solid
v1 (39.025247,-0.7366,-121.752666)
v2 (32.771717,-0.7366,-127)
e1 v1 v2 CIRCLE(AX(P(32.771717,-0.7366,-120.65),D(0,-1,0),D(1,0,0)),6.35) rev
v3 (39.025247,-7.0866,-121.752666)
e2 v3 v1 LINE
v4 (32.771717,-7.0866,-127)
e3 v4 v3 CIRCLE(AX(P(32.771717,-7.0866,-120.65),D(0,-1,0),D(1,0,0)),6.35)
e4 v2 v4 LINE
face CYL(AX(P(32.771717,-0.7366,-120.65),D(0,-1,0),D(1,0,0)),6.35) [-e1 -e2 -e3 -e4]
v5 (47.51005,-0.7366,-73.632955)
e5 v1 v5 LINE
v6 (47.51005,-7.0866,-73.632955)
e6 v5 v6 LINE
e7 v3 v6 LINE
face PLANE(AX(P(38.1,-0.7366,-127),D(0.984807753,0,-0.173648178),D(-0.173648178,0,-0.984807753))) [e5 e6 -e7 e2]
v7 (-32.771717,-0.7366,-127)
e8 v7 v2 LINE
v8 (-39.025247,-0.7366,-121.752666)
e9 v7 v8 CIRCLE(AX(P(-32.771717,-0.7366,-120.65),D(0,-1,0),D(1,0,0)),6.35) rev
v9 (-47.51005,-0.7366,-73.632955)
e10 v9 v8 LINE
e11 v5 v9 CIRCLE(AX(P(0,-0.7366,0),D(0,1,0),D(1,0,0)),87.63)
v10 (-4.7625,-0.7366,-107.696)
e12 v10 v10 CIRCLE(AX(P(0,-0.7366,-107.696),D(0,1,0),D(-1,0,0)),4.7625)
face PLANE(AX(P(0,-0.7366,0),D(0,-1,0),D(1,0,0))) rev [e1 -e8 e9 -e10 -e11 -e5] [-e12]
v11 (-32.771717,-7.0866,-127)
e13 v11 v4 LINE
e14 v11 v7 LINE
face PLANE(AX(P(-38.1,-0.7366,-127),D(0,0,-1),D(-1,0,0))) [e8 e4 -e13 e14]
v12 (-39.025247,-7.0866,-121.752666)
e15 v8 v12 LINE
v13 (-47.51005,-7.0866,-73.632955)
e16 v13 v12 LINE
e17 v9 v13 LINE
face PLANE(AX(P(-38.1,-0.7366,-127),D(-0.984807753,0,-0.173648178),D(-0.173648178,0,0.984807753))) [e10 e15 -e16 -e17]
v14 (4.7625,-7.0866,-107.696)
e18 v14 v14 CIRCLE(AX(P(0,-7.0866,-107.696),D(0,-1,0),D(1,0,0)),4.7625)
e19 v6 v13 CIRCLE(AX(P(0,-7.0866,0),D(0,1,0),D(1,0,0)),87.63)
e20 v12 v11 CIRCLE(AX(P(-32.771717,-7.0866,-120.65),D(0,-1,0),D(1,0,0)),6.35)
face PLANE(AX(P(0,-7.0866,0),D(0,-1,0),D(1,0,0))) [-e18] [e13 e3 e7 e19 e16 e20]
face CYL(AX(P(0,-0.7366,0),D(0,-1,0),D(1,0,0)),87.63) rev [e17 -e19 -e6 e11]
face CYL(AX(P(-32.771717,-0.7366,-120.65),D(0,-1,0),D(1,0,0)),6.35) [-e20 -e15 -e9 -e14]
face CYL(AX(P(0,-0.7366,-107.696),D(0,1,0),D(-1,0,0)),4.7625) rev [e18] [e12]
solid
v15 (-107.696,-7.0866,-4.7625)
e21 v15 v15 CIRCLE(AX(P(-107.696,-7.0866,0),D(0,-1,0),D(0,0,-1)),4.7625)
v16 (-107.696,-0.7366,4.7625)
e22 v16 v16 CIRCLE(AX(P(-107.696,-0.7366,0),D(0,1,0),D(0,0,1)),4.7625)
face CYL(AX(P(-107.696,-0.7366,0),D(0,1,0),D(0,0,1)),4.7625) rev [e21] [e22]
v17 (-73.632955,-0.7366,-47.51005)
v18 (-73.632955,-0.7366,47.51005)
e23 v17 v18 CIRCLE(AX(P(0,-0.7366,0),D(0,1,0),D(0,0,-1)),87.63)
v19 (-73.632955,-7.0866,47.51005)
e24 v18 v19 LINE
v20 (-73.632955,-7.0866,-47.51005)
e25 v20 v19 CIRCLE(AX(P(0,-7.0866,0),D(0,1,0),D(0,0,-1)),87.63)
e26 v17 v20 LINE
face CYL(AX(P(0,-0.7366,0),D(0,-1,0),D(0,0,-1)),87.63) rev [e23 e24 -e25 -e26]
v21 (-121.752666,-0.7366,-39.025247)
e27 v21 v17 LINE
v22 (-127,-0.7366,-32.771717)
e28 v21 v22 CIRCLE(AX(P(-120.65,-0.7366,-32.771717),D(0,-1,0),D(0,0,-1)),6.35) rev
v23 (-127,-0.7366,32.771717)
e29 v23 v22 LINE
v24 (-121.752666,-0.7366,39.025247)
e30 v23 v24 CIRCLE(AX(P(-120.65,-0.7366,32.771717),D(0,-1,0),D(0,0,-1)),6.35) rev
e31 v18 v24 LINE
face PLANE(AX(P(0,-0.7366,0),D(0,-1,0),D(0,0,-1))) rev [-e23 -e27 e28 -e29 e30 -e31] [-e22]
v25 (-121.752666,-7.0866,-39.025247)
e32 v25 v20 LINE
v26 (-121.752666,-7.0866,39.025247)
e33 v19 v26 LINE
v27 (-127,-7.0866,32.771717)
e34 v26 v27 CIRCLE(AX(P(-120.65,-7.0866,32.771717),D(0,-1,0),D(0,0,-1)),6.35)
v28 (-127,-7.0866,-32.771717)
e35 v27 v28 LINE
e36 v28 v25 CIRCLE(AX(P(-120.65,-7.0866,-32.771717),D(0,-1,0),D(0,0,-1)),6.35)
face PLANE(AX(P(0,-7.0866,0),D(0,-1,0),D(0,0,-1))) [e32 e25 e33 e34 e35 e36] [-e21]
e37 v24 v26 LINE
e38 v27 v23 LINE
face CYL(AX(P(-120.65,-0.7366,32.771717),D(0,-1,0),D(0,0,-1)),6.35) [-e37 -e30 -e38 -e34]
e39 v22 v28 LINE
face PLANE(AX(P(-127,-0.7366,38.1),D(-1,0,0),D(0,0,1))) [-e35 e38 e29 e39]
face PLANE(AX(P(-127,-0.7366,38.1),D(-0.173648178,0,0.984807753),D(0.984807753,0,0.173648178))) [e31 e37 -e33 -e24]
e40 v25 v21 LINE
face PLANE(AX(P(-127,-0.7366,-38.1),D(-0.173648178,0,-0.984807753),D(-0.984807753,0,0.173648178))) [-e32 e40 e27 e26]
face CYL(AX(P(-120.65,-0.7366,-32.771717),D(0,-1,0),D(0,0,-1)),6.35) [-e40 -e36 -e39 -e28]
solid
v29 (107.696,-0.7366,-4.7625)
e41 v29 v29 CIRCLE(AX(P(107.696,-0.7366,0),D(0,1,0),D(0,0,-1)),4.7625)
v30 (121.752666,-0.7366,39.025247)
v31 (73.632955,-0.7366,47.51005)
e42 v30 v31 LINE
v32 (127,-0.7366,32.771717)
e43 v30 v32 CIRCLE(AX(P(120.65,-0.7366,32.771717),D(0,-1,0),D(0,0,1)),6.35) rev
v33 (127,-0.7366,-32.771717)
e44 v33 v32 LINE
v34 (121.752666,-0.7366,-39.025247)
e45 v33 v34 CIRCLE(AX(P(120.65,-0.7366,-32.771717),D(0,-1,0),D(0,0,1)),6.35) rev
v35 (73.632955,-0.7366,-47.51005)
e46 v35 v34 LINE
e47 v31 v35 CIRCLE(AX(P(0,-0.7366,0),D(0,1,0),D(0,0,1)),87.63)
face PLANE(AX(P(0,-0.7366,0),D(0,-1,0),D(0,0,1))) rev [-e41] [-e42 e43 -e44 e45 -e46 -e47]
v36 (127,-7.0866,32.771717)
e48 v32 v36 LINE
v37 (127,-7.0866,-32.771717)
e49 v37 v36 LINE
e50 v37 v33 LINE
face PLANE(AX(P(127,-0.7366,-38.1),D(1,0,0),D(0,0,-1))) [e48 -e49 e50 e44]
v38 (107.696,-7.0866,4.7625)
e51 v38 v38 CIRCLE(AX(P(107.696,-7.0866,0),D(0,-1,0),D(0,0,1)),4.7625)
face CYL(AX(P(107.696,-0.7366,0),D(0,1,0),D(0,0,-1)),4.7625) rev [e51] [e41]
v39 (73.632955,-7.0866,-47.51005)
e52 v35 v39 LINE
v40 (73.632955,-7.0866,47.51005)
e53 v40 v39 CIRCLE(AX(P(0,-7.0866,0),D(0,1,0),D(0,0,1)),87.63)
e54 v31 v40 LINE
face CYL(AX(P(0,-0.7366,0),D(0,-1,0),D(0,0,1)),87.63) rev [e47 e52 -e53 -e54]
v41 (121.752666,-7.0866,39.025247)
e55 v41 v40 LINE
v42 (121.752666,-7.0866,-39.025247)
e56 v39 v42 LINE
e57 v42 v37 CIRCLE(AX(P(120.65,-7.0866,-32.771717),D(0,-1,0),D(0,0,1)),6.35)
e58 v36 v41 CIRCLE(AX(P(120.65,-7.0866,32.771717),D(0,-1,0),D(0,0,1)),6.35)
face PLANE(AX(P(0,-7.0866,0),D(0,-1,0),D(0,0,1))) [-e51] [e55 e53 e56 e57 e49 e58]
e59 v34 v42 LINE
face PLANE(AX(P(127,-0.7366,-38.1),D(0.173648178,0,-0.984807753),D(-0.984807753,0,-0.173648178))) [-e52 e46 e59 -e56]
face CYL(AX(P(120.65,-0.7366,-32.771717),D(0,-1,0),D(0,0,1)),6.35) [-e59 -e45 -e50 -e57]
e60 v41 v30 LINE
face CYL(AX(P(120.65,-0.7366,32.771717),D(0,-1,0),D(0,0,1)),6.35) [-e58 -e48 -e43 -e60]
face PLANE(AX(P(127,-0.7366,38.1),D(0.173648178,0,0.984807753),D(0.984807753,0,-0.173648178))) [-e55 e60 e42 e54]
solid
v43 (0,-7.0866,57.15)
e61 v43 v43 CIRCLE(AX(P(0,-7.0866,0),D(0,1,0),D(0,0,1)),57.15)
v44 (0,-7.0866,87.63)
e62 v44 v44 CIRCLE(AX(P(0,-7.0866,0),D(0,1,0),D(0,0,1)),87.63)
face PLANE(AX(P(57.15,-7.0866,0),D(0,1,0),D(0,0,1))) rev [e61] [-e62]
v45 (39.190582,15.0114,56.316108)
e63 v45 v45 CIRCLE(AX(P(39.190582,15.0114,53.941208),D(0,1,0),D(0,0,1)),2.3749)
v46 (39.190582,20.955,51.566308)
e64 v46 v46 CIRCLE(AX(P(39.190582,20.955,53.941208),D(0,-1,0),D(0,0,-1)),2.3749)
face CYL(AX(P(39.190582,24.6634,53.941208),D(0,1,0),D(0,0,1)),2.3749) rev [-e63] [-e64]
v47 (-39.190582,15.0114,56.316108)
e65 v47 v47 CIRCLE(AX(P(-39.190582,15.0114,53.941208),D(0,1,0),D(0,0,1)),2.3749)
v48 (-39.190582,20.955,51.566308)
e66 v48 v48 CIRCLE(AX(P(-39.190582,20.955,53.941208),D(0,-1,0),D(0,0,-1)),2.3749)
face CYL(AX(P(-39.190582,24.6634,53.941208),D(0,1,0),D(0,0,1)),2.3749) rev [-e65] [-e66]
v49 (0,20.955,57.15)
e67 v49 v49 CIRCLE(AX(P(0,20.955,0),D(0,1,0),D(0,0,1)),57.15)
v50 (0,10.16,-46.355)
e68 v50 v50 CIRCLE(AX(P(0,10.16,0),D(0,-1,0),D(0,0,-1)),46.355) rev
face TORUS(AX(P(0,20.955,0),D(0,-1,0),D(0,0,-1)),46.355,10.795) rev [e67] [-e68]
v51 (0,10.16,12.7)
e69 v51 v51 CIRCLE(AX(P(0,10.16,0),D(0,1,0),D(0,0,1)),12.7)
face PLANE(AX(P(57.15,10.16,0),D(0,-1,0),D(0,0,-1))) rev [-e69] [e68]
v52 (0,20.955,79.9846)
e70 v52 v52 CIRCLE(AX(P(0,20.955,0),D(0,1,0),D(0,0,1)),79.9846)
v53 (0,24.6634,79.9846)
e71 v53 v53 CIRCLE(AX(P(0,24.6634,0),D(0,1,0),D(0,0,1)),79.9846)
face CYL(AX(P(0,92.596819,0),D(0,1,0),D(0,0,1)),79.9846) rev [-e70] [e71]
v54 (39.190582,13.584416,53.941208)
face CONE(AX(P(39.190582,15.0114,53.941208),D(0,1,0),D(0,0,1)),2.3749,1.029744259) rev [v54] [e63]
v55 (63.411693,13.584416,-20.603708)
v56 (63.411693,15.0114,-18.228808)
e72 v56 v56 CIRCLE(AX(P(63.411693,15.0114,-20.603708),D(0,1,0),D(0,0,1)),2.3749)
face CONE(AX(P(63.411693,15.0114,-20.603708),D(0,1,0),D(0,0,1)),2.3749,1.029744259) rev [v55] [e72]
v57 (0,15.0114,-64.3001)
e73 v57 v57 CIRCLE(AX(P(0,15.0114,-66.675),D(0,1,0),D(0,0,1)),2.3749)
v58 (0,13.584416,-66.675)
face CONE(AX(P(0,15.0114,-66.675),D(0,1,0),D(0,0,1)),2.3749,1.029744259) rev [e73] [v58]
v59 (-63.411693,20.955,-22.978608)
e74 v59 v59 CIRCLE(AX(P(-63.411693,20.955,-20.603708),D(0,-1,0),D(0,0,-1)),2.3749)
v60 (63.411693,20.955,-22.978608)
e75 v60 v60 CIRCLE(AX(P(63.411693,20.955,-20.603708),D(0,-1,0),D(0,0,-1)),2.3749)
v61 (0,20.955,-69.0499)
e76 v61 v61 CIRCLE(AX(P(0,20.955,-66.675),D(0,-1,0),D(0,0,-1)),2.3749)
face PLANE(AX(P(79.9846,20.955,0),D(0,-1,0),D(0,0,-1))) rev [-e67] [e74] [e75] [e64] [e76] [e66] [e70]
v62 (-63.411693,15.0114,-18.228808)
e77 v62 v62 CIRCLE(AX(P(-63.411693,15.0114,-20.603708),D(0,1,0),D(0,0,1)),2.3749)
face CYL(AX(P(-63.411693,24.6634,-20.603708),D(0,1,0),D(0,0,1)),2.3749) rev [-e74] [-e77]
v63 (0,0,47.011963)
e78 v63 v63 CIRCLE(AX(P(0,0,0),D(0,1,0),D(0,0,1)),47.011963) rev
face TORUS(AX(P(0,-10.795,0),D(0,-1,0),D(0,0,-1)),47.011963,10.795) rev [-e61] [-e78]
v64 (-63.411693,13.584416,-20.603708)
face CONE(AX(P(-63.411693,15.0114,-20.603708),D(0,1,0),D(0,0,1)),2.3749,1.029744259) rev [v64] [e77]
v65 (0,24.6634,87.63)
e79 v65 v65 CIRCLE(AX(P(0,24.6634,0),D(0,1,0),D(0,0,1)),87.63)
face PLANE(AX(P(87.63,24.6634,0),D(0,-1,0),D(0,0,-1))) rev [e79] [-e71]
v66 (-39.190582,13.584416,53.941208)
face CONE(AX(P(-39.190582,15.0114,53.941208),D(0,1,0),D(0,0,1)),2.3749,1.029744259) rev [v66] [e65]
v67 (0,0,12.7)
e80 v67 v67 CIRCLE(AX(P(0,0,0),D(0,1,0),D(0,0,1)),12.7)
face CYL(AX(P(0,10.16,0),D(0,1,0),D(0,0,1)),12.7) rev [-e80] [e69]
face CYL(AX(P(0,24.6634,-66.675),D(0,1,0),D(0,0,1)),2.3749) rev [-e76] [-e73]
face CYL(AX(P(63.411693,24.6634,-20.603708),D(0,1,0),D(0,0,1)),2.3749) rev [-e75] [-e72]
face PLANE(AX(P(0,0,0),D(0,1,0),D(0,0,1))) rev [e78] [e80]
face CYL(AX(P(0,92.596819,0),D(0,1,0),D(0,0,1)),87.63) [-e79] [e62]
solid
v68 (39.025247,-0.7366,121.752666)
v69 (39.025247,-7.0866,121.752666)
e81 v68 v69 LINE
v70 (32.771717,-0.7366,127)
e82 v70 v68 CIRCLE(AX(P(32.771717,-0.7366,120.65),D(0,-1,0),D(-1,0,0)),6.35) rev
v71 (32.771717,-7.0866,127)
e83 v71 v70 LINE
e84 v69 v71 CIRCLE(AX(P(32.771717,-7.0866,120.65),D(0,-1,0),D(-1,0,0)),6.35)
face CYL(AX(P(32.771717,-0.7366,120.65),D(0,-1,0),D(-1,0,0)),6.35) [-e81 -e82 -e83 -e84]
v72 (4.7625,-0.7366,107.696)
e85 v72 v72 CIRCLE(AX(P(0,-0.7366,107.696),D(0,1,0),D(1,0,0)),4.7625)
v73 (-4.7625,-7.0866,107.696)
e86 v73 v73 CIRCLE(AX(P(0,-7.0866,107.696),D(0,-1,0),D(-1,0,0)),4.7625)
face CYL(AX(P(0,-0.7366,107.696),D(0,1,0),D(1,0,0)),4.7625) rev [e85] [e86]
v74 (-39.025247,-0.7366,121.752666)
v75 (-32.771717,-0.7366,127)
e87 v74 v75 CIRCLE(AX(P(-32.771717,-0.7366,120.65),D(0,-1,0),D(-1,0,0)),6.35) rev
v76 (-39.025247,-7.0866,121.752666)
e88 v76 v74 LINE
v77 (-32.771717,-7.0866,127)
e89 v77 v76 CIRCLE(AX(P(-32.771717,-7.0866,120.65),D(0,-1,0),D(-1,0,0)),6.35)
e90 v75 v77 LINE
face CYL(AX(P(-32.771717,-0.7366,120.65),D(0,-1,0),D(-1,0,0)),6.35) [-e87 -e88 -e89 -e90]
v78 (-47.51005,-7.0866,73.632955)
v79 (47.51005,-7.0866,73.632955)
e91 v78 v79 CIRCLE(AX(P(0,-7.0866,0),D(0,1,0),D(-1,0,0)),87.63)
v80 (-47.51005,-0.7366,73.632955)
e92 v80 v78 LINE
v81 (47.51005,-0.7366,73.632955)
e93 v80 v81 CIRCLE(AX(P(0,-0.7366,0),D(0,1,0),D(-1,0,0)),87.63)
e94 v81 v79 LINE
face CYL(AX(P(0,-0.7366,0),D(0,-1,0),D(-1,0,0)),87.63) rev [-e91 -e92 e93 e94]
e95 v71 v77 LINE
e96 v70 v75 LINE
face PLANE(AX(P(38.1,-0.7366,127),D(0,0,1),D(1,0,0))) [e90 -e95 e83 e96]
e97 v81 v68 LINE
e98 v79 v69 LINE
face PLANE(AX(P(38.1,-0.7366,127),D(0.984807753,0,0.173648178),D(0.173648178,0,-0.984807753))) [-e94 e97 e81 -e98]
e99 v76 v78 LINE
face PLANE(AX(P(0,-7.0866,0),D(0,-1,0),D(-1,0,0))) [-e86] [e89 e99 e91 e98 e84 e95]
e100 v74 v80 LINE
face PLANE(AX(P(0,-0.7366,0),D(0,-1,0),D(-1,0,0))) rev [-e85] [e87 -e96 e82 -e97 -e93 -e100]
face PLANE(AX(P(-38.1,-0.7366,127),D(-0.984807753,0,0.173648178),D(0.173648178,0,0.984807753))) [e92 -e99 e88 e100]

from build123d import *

# Parameters (mm, degrees)
F_3_16_0_187_DIAMETER_HOLE1_AT_2_COUNT = 2
F_3_16_0_187_DIAMETER_HOLE1_AT_2_PITCH = 181.676687383
CIRPATTERN2_COUNT                      = 5
F_1_1_DIAMETER_HOLE1_D                 = 25.4
BOSS_EXTRUDE1_DEPTH                    = 6.35
FILLET2_R                              = 6.35
CIRPATTERN4_COUNT                      = 4
FILLET3_R                              = 10.795


with BuildPart() as part:
    # Sketch1 → Revolve1 (revolve)
    with BuildSketch(Plane.XY, mode=Mode.PRIVATE) as revolve1_sk:
        Polygon((87.63, -7.0866), (87.63, 24.6634), (79.9846, 24.6634), (79.9846, 20.955), (57.15, 20.955), (57.15, 10.16), (0, 10.16), (0, 0), (57.15, 0), (57.15, -7.0866), align=None)
    revolve(revolve1_sk.sketch.rotate(Axis((0, 92.596818824, 0), (0, -1, 0)), 90), axis=Axis((0, 92.596818824, 0), (0, -1, 0)))

    # Sketch6 → 3/16 (0.187) Diameter Hole1 (revolve, cut)
    with BuildSketch(Plane(origin=(0, 24.6634, -66.675), x_dir=(0, 0, 1), z_dir=(1, 0, 0))):
        Polygon((0, 0), (0, 11.078983884), (2.3749, 9.652), (2.3749, 0), align=None)
    f_3_16_0_187_diameter_hole1 = revolve(axis=Axis((0, 31.0134, -66.675), (0, -1, 0)), mode=Mode.SUBTRACT)

    # 3/16 (0.187) Diameter Hole1 at 2: 3/16 (0.187) Diameter Hole1 ×2
    with Locations(*[Vector(-0.6277965872660483, 0, 0.778377443800309) * (i * F_3_16_0_187_DIAMETER_HOLE1_AT_2_PITCH) for i in range(1, F_3_16_0_187_DIAMETER_HOLE1_AT_2_COUNT)]):
        add(f_3_16_0_187_diameter_hole1, mode=Mode.SUBTRACT)

    # CirPattern2: 3/16 (0.187) Diameter Hole1 ×5 about axis
    cirpattern2_axis = Axis((0, 0, 0), (0, 1, 0))
    for i in range(1, CIRPATTERN2_COUNT):
        add(f_3_16_0_187_diameter_hole1.rotate(cirpattern2_axis, i * 360 / CIRPATTERN2_COUNT), mode=Mode.SUBTRACT)

    # CirPattern2 copy 1 sketch → CirPattern2 copy 1 (revolve, cut)
    with BuildSketch(Plane(origin=(35.834852053, 24.6634, 131.569029239), x_dir=(0.9510565162951535, 0, 0.30901699437494745), z_dir=(0.30901699437494745, 0, -0.9510565162951535))):
        Polygon((0, 0), (0, 11.078983884), (2.3749, 9.652), (2.3749, 0), align=None)
    revolve(axis=Axis((35.834852053, 31.0134, 131.569029239), (0, -1, 0)), mode=Mode.SUBTRACT)

    # CirPattern2 copy 2 sketch → CirPattern2 copy 2 (revolve, cut)
    with BuildSketch(Plane(origin=(136.203160876, 24.6634, 6.576096413), x_dir=(0.5877852522924732, 0, -0.8090169943749473), z_dir=(-0.8090169943749473, 0, -0.5877852522924732))):
        Polygon((0, 0), (0, 11.078983884), (2.3749, 9.652), (2.3749, 0), align=None)
    revolve(axis=Axis((136.203160876, 31.0134, 6.576096413), (0, -1, 0)), mode=Mode.SUBTRACT)

    # CirPattern2 copy 3 sketch → CirPattern2 copy 3 (revolve, cut)
    with BuildSketch(Plane(origin=(48.343330743, 24.6634, -127.504778142), x_dir=(-0.587785252292473, 0, -0.8090169943749476), z_dir=(-0.8090169943749476, 0, 0.587785252292473))):
        Polygon((0, 0), (0, 11.078983884), (2.3749, 9.652), (2.3749, 0), align=None)
    revolve(axis=Axis((48.343330743, 31.0134, -127.504778142), (0, -1, 0)), mode=Mode.SUBTRACT)

    # CirPattern2 copy 4 sketch → CirPattern2 copy 4 (revolve, cut)
    with BuildSketch(Plane(origin=(-106.325339347, 24.6634, -85.378383033), x_dir=(-0.9510565162951536, 0, 0.30901699437494723), z_dir=(0.30901699437494723, 0, 0.9510565162951536))):
        Polygon((0, 0), (0, 11.078983884), (2.3749, 9.652), (2.3749, 0), align=None)
    revolve(axis=Axis((-106.325339347, 31.0134, -85.378383033), (0, -1, 0)), mode=Mode.SUBTRACT)

    # 1 (1) Diameter Hole1 (through all)
    with Locations(Plane(origin=(0, 10.16, 0), x_dir=(1, 0, 0), z_dir=(0, 1, 0))):
        with Locations((0, 0)):
            Hole(F_1_1_DIAMETER_HOLE1_D / 2)

    # Fillet3
    # the kernel refuses this fillet: 10.795 mm, written as the material it adds along each edge
    with BuildSketch(Plane(origin=(0, 10.16, 0), x_dir=(0, 0, 1), z_dir=(1, 0, 0))) as fillet3_piece_1:
        with BuildLine():
            CenterArc((57.15 - FILLET3_R, -FILLET3_R), FILLET3_R, 0, 90)
            Line((57.15 - FILLET3_R, 0), (57.15 - FILLET3_R, FILLET3_R * 0.02))
            Line((57.15 - FILLET3_R, FILLET3_R * 0.02), (57.15 + FILLET3_R * 0.02, FILLET3_R * 0.02))
            Line((57.15 + FILLET3_R * 0.02, FILLET3_R * 0.02), (57.15 + FILLET3_R * 0.02, -FILLET3_R))
            Line((57.15 + FILLET3_R * 0.02, -FILLET3_R), (57.15, -FILLET3_R))
        make_face()
    revolve(axis=Axis((0, 10.16, 0), (0, -1, 0)))
    with BuildSketch(Plane(origin=(0, 0, 0), x_dir=(0, 0, 1), z_dir=(1, 0, 0))) as fillet3_piece_2:
        with BuildLine():
            CenterArc((47.011962989, 10.795), FILLET3_R, 270, 69.907948581)
            Line((47.011962989, 0), (47.011962989, -0.2159))
            Line((47.011962989, -0.2159), (57.15, -0.2159))
            Line((57.15, -0.2159), (57.3659, 0))
            ThreePointArc((57.3659, 0), (57.3659, 3.5433), (57.35276074, 7.012432))
            Line((57.35276074, 7.012432), (57.15, 7.0866))
        make_face()
    revolve(axis=Axis((0, 0, 0), (0, -1, 0)))


with BuildPart() as body_2:
    # Sketch15 → Boss-Extrude1 (new body)
    with BuildSketch(Plane.XZ.offset(7.0866)):
        with BuildLine():
            Line((-127, -38.1), (-73.632954963, -47.510049921))
            ThreePointArc((-73.632954963, -47.510049921), (-87.63, 0), (-73.632954963, 47.510049921))
            Line((-73.632954963, 47.510049921), (-127, 38.1))
            Line((-127, 38.1), (-127, -38.1))
        make_face()
    extrude(amount=-BOSS_EXTRUDE1_DEPTH)

    # Fillet2
    fillet2_edges = [body_2.edges().sort_by_distance(p)[0] for p in [
        (-127, -3.9116, 38.1),
        (-127, -3.9116, -38.1),
    ]]
    fillet(fillet2_edges, radius=FILLET2_R)

    # Sketch17 → 3/8 (0.375) Diameter Hole1 (revolve, cut)
    with BuildSketch(Plane(origin=(-107.696, -0.7366, 0), x_dir=(0, 0, 1), z_dir=(1, 0, 0))):
        Polygon((0, 0), (0, 28.261598698), (4.7625, 25.4), (4.7625, 0), align=None)
    revolve(axis=Axis((-107.696, 5.6134, 0), (0, -1, 0)), mode=Mode.SUBTRACT)


with BuildPart() as cirpattern4_1:
    # CirPattern4: pattern copy
    add(body_2.part.rotate(Axis((0, 0, 0), (0, 1, 0)), 1 * 360 / CIRPATTERN4_COUNT))


with BuildPart() as cirpattern4_2:
    # CirPattern4: pattern copy
    add(body_2.part.rotate(Axis((0, 0, 0), (0, 1, 0)), 2 * 360 / CIRPATTERN4_COUNT))


with BuildPart() as cirpattern4_3:
    # CirPattern4: pattern copy
    add(body_2.part.rotate(Axis((0, 0, 0), (0, 1, 0)), 3 * 360 / CIRPATTERN4_COUNT))


solid = Compound([part.part, body_2.part, cirpattern4_1.part, cirpattern4_2.part, cirpattern4_3.part])
